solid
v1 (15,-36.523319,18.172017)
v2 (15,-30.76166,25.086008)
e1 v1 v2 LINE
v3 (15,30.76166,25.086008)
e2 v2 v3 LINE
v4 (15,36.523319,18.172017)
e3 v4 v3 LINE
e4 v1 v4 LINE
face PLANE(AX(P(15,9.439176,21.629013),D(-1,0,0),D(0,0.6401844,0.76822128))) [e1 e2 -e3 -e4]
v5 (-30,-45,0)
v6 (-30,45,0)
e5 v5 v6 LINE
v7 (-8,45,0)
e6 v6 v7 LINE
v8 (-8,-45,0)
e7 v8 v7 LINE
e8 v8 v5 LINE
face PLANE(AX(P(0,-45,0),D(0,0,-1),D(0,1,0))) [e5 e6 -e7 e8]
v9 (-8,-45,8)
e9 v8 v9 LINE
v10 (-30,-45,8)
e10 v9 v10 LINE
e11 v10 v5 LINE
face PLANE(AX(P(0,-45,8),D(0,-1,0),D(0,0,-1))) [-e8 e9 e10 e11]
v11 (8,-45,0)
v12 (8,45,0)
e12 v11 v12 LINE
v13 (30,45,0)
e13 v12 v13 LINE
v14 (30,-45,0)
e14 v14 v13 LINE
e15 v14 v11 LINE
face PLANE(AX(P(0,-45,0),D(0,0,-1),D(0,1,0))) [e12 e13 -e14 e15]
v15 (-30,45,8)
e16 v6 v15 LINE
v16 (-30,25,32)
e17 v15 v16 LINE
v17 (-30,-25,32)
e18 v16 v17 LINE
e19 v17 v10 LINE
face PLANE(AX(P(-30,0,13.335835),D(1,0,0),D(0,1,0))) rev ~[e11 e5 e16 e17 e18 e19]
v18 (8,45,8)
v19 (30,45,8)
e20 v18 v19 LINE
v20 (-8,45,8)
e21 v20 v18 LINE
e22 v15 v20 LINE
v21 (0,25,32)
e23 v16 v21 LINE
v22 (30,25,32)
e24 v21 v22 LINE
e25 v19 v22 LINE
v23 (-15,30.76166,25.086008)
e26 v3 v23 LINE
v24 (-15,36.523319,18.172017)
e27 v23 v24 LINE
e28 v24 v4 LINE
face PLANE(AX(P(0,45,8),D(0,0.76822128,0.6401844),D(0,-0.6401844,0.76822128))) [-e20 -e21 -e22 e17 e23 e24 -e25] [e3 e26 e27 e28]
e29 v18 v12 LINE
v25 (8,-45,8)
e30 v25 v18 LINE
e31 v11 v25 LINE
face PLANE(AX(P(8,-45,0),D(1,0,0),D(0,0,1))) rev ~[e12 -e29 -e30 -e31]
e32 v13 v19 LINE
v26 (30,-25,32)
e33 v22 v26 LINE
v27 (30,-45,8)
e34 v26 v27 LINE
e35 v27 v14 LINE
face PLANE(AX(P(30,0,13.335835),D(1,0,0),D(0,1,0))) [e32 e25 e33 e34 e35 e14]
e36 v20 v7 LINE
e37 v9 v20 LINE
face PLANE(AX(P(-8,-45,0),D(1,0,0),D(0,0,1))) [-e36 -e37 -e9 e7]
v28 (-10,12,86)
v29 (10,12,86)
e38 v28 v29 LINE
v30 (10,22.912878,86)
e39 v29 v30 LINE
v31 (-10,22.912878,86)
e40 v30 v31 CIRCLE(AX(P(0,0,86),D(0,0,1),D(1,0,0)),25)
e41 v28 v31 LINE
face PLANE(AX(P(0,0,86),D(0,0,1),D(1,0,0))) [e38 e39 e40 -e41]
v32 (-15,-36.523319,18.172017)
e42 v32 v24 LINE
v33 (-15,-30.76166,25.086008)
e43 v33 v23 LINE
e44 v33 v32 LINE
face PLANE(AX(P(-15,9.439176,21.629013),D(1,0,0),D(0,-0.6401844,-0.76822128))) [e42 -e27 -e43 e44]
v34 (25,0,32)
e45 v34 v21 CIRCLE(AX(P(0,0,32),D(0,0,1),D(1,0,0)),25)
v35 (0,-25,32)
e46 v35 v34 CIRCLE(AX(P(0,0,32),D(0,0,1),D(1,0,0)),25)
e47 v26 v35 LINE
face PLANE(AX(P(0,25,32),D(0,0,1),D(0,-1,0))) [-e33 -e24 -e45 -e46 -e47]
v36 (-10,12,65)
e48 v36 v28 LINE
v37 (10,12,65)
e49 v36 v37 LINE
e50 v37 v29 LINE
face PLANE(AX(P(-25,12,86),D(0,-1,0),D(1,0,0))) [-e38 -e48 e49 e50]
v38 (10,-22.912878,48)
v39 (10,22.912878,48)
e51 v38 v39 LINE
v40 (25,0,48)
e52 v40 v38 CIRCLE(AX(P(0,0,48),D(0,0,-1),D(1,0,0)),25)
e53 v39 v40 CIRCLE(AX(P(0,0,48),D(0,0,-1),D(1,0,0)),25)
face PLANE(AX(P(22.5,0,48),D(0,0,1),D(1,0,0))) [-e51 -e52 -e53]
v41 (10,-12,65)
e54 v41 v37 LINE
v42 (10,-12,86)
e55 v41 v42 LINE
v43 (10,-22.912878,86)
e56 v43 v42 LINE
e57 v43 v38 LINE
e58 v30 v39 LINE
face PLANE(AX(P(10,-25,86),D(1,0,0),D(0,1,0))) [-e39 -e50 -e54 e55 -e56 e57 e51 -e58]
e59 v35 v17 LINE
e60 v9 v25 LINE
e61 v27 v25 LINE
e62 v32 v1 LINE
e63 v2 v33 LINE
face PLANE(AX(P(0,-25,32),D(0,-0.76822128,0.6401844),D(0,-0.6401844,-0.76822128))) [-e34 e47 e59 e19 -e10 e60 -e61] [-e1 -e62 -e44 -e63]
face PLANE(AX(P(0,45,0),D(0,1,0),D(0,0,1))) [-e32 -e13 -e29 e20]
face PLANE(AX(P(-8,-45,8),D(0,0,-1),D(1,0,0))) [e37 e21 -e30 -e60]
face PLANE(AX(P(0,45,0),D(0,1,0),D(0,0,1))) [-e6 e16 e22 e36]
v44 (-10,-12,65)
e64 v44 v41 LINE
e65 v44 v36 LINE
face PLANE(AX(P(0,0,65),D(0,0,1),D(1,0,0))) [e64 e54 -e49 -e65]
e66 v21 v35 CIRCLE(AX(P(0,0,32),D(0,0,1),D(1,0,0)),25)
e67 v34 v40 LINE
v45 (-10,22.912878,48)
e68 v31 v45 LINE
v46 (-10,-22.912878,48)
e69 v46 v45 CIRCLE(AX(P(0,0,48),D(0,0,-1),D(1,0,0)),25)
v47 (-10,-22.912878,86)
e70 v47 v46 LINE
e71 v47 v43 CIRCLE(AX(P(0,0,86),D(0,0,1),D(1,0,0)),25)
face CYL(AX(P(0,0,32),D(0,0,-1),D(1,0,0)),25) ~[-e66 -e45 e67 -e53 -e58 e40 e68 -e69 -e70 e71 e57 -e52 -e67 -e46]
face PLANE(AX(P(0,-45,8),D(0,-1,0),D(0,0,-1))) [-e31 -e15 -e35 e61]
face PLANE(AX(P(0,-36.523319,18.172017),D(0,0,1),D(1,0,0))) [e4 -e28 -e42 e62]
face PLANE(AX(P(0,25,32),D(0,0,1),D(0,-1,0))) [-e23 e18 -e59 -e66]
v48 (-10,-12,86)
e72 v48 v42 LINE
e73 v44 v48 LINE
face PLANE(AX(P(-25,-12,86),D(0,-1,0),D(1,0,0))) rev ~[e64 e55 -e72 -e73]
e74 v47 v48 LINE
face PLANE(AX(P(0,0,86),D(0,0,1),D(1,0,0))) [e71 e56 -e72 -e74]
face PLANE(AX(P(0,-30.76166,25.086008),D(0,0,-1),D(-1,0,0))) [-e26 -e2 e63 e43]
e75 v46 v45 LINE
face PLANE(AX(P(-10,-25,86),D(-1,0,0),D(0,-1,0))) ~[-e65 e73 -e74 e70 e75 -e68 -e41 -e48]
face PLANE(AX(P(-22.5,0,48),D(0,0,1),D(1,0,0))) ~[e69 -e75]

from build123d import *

# Parameters (mm, degrees)
F1_DEPTH  = 30
F2_R      = 25
F3_DEPTH  = 54
F4_W      = 50
F4_H      = 24
F5_DEPTH  = 21
F6_W      = 25
F6_H      = 50
F7_DEPTH  = 38
F8_W      = 30
F8_H      = 9
F11_W     = 16
F11_H     = 8
F12_DEPTH = 90.001


# Not quite as in the source:
# - a pattern or mirror of a feature is missing from the dataset's text; its kind, count and spacing are read off the source's solid


with BuildPart() as f1:
    # F0 (on Right) → F1 (new body, symmetric)
    with BuildSketch(Plane.YZ):
        Polygon((-45, 0), (0, 0), (45, 0), (45, 8), (25, 32), (0, 32), (-25, 32), (-45, 8), align=None)
    extrude(amount=F1_DEPTH, both=True)

    # F2 (on face) → F3 (join)
    with BuildSketch(Plane.XY.offset(32)):
        Circle(F2_R)
    extrude(amount=F3_DEPTH)

    # F4 (on face) → F5 (cut)
    with BuildSketch(Plane.XY.offset(86)):
        Rectangle(F4_W, F4_H)
    extrude(amount=-F5_DEPTH, mode=Mode.SUBTRACT)

    # F6 (on face) → F7 (cut)
    with BuildSketch(Plane.XY.offset(86)):
        with Locations((22.5, 0)):
            Rectangle(F6_W, F6_H)
    f7 = extrude(amount=-F7_DEPTH, mode=Mode.SUBTRACT)

    # F7_copies: F7 across plane
    add(f7.mirror(Plane(origin=(0, 0, 0), x_dir=(0, 0, -1), z_dir=(-1, 0, 0))), mode=Mode.SUBTRACT)

    # F10: sweep along a path in F9
    with BuildLine(Plane.YZ.offset(30)) as f10_path:
        Line((-35, 20), (51.1633306742, 20))
    # F8 (on face) → F10 (sweep, cut)
    with BuildSketch(Plane(origin=(0, -30.4918032787, 25.4098360656), x_dir=(1, 0, 0), z_dir=(0, -0.7682212796, 0.6401843997))):
        with Locations((0, -4.9215290445)):
            Rectangle(F8_W, F8_H)
    sweep(path=f10_path.line, mode=Mode.SUBTRACT)

    # F11 (on face) → F12 (cut, through all)
    with BuildSketch(Plane.XZ.offset(45)):
        with Locations((0, 4)):
            Rectangle(F11_W, F11_H)
    extrude(amount=-F12_DEPTH, mode=Mode.SUBTRACT)


solid = f1.part
